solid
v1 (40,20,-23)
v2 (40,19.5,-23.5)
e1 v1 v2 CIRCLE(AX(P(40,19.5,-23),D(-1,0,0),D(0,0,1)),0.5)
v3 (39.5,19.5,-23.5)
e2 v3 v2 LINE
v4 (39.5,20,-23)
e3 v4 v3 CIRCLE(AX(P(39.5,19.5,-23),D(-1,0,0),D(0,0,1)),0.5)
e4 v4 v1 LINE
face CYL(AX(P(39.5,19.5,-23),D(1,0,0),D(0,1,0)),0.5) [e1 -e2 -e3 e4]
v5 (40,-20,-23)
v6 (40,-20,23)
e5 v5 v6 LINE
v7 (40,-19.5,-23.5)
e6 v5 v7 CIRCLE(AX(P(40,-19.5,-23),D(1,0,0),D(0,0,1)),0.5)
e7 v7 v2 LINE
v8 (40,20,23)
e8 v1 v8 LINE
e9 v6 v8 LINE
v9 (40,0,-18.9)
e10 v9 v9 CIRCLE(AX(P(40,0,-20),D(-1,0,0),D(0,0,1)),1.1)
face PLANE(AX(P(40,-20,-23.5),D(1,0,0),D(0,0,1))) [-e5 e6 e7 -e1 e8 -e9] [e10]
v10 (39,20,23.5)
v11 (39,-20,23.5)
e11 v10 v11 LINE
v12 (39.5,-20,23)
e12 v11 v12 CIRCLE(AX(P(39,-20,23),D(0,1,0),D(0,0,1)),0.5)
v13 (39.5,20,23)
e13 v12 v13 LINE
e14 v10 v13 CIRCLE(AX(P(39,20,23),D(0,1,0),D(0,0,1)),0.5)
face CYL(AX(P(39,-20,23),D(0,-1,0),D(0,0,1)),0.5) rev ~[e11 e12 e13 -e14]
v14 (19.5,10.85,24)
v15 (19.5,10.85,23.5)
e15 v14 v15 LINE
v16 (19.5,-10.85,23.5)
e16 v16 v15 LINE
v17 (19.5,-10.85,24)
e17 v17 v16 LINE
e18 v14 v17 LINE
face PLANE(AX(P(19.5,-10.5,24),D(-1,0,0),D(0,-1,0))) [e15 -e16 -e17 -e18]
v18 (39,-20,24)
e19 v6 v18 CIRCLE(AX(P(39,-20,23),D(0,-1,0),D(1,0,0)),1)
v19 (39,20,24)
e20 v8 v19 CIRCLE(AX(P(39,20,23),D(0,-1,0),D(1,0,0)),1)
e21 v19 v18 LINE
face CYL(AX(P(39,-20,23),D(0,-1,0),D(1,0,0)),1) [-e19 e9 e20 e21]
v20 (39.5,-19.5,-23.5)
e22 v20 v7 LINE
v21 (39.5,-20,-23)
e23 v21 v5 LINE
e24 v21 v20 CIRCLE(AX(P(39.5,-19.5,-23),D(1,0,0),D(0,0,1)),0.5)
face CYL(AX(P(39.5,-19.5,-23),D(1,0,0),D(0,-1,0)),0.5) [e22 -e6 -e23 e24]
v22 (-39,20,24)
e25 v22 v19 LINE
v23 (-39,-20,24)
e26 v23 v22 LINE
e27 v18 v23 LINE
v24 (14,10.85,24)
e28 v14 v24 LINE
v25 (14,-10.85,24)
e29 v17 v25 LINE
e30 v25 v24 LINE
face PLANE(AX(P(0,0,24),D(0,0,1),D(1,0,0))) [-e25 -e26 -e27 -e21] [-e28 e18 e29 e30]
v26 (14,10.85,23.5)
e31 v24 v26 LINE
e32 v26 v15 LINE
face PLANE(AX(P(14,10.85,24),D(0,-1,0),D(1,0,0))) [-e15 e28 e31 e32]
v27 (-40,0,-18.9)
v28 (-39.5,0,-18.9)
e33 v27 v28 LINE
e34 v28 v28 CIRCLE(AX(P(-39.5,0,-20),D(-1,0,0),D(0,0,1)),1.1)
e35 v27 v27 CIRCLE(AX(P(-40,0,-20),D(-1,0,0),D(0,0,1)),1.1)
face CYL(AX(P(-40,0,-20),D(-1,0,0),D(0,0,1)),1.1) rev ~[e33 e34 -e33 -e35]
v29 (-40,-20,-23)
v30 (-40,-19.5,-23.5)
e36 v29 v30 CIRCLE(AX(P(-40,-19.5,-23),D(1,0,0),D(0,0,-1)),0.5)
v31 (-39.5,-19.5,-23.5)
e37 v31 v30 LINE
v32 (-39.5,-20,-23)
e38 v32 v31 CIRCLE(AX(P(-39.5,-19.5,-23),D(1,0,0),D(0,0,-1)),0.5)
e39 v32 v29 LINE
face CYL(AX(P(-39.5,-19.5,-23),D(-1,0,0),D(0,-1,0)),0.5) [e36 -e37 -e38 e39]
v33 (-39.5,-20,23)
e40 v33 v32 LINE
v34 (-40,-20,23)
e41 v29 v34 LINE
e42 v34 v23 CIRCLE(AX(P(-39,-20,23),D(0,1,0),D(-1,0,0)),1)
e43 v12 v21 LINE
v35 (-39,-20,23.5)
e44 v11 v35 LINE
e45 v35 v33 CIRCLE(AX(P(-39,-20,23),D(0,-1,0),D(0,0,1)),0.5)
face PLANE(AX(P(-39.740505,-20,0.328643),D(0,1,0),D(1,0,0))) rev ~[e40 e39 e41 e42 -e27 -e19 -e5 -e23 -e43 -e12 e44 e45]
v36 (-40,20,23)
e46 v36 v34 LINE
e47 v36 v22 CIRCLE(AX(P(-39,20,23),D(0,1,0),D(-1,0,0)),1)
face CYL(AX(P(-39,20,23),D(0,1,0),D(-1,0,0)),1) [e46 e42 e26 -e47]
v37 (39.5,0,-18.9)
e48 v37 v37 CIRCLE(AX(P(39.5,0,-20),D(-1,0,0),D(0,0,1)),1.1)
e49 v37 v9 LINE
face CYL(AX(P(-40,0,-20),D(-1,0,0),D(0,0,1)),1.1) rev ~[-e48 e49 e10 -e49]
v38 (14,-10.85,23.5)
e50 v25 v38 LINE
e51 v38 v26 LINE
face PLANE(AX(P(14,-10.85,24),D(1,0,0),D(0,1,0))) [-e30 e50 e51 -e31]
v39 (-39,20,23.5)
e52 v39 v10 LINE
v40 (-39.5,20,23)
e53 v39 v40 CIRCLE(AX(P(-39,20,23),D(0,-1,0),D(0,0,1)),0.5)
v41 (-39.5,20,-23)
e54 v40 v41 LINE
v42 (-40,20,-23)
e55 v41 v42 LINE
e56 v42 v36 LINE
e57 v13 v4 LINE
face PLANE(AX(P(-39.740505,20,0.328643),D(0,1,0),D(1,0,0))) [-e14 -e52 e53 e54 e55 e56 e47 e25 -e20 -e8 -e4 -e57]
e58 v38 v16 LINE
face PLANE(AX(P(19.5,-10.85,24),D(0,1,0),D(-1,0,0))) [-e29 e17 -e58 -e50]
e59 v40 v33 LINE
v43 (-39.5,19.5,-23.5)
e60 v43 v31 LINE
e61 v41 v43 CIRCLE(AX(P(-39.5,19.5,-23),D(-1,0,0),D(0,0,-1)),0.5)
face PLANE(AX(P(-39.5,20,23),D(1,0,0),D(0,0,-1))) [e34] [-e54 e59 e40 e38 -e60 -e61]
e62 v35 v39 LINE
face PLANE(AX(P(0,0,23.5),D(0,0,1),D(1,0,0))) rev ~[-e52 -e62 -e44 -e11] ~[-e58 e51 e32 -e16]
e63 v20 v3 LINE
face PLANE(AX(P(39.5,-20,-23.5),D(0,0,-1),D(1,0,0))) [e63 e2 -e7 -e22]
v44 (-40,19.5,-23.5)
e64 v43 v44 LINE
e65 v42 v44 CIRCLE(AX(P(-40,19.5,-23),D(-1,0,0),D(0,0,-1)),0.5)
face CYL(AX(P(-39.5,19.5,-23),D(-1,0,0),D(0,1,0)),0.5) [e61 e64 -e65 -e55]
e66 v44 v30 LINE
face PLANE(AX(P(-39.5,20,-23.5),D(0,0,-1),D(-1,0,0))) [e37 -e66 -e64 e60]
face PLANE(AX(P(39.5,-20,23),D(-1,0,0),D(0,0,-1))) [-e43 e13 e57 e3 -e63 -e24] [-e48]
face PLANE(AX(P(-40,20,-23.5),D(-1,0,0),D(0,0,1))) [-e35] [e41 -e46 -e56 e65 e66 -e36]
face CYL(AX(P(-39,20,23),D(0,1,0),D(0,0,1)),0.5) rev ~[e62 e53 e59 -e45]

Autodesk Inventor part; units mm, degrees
ref_plane "YZ Plane" through (0, 0, 0) normal (1, 0, 0) x (0, 1, 0)
ref_plane "XZ Plane" through (0, 0, 0) normal (0, 1, 0) x (-1, 0, 0)
ref_plane "РабПлоскость1" through (0, 0, 24) normal (0, 0, 1) x (1, 0, 0)
sketch "Эскиз1" plane through (0, 0, 24) normal (0, 0, 1) x (1, 0, 0)
  line L0 (-40, 20) -> (40, 20)
  line L1 (40, 20) -> (40, -20)
  line L2 (40, -20) -> (-40, -20)
  line L3 (-40, -20) -> (-40, 20)
  line L4 (-40, 20) -> (40, -20) construction
  line L5 (40, 20) -> (-40, -20) construction
  point P0 (0, 0)
  dimension "d1" = 80
  dimension "d2" = 40
extrude "Пластина1" add sketch "Эскиз1" against normal blind 0.5
sketch "Эскиз2" plane through (-39.5, 20, 24) normal (-1, 0, 0) x (0, -1, 0)
  line L0 (40, 0) -> (0, 0)
  line L1 (0, 0) -> (0, -47.5)
  line L2 (0, -47.5) -> (40, -47.5)
  line L3 (40, -47.5) -> (40, 0)
edge flange "Фланец1" height 47.5 angle 90 thickness 0.5 bend radius 0.5 thickness toward (-1, 0, 0) relief tear relief width 0.5 relief depth 0.25 corner gap 0.5 corner form 0 edges at (-40, 0, 23.5) (40, 0, 23.5) wall of the first edge with corners at (-39.5, -20, 24) (-39.5, 20, 24) (-39.5, 20, -23.5) (-39.5, -20, -23.5)
bend "Сгиб1"
corner "УглСтык1"
sketch "Эскиз3" plane through (0, 0, 24) normal (0, 0, 1) x (1, 0, 0)
  line L0 (19.5, -10.85) -> (14, -10.85)
  line L1 (14, -10.85) -> (14, 10.85)
  line L2 (14, 10.85) -> (19.5, 10.85)
  line L3 (19.5, 10.85) -> (19.5, -10.85)
  line L4 (19.5, -10.85) -> (14, 10.85) construction
  line L5 (14, -10.85) -> (19.5, 10.85) construction
  line L6 (14.5, -10.5) -> (18.5, -10.5) projected
  line L7 (14.5, -10.5) -> (14.5, -9) projected
  line L8 (18.5, -10.5) -> (18.5, -9) projected
  line L9 (18.5, -9) -> (14.5, -9) projected
  line L10 (14.5, 9) -> (18.5, 9) projected
  line L11 (14.5, 9) -> (14.5, 10.5) projected
  line L12 (14.5, 10.5) -> (18.5, 10.5) projected
  line L13 (18.5, 9) -> (18.5, 10.5) projected
  line L14 (13.98, 11.925) -> (17.88, 11.925) projected
  line L15 (18.38, 10.5) -> (18.38, 11.925) projected
  line L16 (17.88, -11.925) -> (13.98, -11.925) projected
  line L17 (18.38, -11.925) -> (18.38, -10.5) projected
  line L18 (19.5, 9) -> (19.5, -9) projected
  line L19 (19.5, -10.5) -> (19.5, -9) projected
  line L20 (19.5, -10.5) -> (18.5, -10.5) projected
  line L21 (19.5, 9) -> (18.5, 9) projected
  line L22 (34.5, -2.5) -> (34.5, 2.5)
  line L23 (34.5, 0) -> (19.5, 0)
  point P0 (0, 0)
  point P1 (16.75, 0)
  point P2 (14, 0)
  dimension "d14" = 5.5
  dimension "d15" = 21.7
  dimension "d19" = 15
fillet "УглСкругление1" radius 0.5 4 edges at (-39.75, 20, -23.5) (-39.75, -20, -23.5) (39.75, 20, -23.5) (39.75, -20, -23.5)
extrude "Вырез1" cut sketch "Эскиз3" against normal blind 0.5
sketch "Эскиз4" plane through (-40, -20, 23) normal (-1, 0, 0) x (0, 0, 1)
  circle A0 centre (-43, 20) radius 1.5 projected
  circle A1 centre (-43, 20) radius 1.1
  point P0 (-23, 20)
  dimension "d20" = 2.2
extrude "Вырез2" cut sketch "Эскиз4" against normal blind 80 contours A1
sketch "Эскиз5" plane through (0, 0, 24) normal (0, 0, 1) x (1, 0, 0)
  line L0 (19.5, 10.85) -> (19.5, -10.85) projected
  line L1 (19.5, -10.85) -> (14, -10.85) projected
  line L2 (14, -10.85) -> (14, 10.85) projected
  line L3 (14, 10.85) -> (19.5, 10.85) projected
  line L4 (39, -20) -> (39, 20) projected
  line L5 (-39, 20) -> (39, 20) projected
  line L6 (-39, 20) -> (-39, -20) projected
  line L7 (39, -20) -> (-39, -20) projected
  line L8 (-40, -20) -> (-40, 20) projected
  line L9 (-40, -20) -> (-39, -20) projected
  line L10 (-39, 20) -> (-40, 20) projected
  line L11 (39, -20) -> (40, -20) projected
  line L12 (40, 20) -> (40, -20) projected
  line L13 (40, 20) -> (39, 20) projected
  point P0 (0, 0)
sketch "Эскиз6" plane through (-40, -20, 23) normal (-1, 0, 0) x (0, 0, 1)
  circle A0 centre (-43, 20) radius 1.1 projected
  arc A1 (-46, 40) -> (-46.5, 39.5) centre (-46, 39.5) ccw projected
  line L0 (-46.5, 0.5) -> (-46.5, 39.5) projected
  arc A2 (-46.5, 0.5) -> (-46, 0) centre (-46, 0.5) ccw projected
  line L1 (0, 0) -> (-46, 0) projected
  line L2 (0, 0) -> (0, 40) projected
  line L3 (-46, 40) -> (0, 40) projected
  point P0 (-23, 20)
equation "\"d17\" = Толщина"
equation "\"d3\" = Толщина"
equation "\"d4\" = Ширина_просечки"
equation "\"d5\" = Глубина_просечки"
equation "\"d6\" = Мин_остаток"
equation "\"d7\" = Радиус_перехода"
equation "\"d10\" = Радиус_гибки"
equation "\"d11\" = Размер_просечки"
equation "\"d12\" = Размер_зазора"
equation "\"d13\" = Радиус_Якоби"
equation "\"Радиус_гибки\" = Толщина"
equation "\"Ширина_просечки\" = Толщина"
equation "\"Глубина_просечки\" = 0.5 * Толщина"
equation "\"Размер_просечки\" = 4 * Толщина"
equation "\"Мин_остаток\" = 2 * Толщина"
equation "\"Радиус_перехода\" = Радиус_гибки"
equation "\"Радиус_Якоби\" = Радиус_гибки"
equation "\"Размер_зазора\" = Толщина"
equation "\"Толщина\" = 0.5"
properties part number "metal_cap"
